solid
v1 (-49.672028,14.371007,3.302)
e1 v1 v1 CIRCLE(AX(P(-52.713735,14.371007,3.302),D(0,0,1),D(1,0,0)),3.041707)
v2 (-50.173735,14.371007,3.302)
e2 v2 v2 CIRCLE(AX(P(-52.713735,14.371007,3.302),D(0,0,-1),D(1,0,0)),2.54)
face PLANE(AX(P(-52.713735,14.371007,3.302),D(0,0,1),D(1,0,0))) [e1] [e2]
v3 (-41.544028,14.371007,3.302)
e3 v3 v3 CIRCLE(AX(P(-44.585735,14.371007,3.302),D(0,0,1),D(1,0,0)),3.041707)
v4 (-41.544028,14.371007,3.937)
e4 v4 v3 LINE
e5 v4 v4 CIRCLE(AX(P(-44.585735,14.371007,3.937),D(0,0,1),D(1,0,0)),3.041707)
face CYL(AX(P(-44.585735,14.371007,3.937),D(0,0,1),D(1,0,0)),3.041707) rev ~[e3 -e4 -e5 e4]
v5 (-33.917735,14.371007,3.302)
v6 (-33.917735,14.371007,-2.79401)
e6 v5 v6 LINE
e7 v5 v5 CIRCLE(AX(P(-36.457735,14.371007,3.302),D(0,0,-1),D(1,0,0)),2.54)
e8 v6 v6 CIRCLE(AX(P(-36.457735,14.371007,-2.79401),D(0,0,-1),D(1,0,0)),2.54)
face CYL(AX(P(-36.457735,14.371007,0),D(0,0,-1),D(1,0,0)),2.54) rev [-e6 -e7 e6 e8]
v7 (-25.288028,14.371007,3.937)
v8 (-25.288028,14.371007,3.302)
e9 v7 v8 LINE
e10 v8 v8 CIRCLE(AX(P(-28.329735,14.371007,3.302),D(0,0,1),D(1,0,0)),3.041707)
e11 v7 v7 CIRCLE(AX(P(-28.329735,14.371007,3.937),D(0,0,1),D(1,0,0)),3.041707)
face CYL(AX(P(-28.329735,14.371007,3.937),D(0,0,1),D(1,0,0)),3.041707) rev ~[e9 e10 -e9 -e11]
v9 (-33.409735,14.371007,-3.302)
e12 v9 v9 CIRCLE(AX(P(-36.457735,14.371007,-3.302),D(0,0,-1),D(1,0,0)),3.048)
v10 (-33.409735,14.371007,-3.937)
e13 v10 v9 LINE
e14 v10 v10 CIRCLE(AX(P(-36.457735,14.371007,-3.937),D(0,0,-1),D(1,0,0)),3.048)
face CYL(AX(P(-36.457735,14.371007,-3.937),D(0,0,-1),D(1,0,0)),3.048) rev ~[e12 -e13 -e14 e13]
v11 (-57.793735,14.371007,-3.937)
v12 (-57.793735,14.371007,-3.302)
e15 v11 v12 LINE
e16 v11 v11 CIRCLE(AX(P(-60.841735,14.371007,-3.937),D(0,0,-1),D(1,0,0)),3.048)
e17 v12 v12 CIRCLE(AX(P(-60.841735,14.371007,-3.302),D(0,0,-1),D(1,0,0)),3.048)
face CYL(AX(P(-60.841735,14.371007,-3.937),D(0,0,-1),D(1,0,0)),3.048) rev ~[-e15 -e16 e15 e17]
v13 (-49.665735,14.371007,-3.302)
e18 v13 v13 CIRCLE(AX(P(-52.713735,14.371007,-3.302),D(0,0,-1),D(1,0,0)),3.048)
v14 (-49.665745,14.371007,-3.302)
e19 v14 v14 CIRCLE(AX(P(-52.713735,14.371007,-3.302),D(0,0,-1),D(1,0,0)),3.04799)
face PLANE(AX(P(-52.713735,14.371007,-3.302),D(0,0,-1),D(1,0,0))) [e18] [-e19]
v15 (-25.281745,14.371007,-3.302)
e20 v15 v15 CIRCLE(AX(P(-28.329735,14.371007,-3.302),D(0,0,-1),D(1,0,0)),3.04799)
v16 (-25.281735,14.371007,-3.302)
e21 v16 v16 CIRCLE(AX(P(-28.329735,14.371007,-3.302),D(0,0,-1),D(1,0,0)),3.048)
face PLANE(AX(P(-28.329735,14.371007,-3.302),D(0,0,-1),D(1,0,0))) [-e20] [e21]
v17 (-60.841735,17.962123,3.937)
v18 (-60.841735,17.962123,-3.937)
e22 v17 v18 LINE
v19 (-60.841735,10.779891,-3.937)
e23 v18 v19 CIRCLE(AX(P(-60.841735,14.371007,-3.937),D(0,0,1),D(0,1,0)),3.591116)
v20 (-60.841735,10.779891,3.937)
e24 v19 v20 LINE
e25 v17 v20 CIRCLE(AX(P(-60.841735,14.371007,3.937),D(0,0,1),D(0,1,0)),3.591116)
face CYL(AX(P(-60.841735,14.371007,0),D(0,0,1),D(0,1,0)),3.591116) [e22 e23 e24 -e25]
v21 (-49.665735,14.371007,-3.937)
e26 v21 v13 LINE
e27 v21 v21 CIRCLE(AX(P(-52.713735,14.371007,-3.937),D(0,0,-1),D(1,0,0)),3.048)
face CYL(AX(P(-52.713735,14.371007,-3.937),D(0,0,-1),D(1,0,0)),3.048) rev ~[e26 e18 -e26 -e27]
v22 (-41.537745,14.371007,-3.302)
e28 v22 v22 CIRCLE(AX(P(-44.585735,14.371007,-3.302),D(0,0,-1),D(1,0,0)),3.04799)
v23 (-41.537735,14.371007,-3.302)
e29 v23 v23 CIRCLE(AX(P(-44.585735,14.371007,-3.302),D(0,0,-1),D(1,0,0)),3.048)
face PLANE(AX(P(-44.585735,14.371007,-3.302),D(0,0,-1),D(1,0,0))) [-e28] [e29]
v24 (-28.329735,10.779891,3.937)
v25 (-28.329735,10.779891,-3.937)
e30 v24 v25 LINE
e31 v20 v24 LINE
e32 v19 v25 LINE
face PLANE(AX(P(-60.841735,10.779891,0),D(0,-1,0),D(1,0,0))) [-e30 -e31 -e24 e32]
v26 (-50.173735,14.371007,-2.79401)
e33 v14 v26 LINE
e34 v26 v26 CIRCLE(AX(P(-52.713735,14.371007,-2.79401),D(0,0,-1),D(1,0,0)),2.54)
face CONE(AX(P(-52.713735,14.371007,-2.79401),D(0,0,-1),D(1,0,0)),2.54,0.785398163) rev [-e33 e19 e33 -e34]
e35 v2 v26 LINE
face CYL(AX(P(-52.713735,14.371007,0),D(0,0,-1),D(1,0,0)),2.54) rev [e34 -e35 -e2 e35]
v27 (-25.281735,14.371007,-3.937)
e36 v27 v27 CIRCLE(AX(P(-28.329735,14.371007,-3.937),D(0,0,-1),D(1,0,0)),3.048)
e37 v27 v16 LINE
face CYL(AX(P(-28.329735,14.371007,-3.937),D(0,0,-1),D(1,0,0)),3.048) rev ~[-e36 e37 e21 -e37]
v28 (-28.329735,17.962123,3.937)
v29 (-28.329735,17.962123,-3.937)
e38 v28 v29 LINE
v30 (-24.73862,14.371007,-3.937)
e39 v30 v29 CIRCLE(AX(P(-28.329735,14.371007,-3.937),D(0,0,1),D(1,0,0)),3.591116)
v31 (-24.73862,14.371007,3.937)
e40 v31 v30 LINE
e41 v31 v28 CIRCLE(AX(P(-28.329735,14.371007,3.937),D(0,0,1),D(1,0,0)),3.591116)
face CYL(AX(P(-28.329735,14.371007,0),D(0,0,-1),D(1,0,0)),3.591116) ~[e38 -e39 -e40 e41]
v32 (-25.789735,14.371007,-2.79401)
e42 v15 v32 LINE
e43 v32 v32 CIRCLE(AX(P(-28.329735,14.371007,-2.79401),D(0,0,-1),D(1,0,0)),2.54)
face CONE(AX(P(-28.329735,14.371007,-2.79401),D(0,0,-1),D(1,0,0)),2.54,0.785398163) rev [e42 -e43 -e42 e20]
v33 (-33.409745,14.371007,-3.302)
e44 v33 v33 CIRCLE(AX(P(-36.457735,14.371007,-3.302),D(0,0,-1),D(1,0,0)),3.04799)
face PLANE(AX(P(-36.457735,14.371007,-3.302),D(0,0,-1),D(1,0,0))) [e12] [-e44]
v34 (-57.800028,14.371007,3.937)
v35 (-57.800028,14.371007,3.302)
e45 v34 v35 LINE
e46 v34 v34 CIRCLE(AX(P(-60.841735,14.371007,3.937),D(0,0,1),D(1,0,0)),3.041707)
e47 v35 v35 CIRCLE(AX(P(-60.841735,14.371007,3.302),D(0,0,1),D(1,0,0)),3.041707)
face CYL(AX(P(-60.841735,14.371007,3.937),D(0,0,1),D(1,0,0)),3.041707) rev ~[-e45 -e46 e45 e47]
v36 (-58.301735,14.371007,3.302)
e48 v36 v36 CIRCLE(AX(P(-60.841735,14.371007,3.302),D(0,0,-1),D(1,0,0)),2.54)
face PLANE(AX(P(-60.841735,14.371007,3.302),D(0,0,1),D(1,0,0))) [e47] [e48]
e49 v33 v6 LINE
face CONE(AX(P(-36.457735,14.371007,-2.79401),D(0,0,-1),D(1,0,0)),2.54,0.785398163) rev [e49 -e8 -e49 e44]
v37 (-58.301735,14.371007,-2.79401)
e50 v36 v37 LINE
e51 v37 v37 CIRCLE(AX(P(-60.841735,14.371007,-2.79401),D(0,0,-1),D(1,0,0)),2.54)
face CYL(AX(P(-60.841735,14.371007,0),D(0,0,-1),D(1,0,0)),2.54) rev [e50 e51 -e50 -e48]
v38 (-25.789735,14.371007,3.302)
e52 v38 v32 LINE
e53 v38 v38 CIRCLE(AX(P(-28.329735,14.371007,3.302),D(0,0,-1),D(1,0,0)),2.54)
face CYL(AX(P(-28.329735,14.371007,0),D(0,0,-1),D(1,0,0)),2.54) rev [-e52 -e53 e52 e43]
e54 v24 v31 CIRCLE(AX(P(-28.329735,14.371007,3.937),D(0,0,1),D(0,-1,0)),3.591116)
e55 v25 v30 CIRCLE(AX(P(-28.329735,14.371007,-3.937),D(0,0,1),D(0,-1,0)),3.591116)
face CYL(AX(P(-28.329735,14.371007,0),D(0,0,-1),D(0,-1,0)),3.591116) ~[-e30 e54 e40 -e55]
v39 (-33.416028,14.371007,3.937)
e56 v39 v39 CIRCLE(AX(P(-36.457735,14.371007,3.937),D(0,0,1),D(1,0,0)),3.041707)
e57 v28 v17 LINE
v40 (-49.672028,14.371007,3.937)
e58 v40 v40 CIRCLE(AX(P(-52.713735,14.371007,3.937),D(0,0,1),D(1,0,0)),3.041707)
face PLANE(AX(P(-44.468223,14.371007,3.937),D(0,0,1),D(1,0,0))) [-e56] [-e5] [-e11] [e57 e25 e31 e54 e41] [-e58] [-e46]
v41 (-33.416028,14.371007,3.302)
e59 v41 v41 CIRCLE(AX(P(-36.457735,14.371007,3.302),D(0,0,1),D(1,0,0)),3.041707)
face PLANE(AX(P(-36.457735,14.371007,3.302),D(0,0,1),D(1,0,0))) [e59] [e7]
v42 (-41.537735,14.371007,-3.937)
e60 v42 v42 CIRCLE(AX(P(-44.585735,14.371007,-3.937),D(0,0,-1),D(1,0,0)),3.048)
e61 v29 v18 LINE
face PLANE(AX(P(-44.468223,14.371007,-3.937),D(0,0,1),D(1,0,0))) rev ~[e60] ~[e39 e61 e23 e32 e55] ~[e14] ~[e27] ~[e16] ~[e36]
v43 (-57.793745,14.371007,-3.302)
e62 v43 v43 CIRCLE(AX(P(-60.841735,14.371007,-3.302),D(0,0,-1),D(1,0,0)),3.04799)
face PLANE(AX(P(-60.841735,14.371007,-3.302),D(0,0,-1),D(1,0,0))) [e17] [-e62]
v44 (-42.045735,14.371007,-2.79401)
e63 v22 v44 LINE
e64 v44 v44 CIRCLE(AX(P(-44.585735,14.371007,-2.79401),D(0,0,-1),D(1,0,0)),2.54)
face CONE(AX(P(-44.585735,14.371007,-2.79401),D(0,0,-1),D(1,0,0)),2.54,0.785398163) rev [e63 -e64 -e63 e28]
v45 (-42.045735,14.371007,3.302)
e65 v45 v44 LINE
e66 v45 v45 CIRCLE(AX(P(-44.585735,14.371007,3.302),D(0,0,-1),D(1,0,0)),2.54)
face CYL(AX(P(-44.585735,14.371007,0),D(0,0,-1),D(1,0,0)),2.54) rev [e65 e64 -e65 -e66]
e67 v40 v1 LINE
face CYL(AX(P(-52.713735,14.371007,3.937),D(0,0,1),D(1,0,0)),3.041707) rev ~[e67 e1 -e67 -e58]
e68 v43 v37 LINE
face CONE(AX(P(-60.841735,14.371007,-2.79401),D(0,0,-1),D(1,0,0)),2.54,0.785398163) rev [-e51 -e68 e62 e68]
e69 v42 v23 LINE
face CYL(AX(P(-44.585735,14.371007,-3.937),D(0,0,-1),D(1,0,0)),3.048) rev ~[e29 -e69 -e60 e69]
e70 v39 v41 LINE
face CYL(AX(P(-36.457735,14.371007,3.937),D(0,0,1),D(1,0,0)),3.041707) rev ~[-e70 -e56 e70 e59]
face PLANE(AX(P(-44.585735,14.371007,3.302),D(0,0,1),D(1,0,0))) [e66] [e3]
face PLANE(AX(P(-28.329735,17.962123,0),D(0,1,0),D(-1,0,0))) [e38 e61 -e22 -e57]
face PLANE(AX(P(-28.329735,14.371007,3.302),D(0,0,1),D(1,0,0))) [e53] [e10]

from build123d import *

# Parameters (mm, degrees)
F0_R     = 3.048
F0_R_2   = 2.54
F1_DEPTH = 3.937
F2_R     = 3.0417071759
F3_DEPTH = 0.635
F4_R     = 3.048
F5_DEPTH = 0.635
F6_SIZE2 = 0.50799
F6_SIZE  = 0.50799
F7_SIZE2 = 0.50799
F7_SIZE  = 0.50799


# Not quite as in the source:
# - a fillet or chamfer is up to 0.001 mm smaller than in the source, because OpenCascade refuses the exact size


with BuildPart() as f1:
    # F0 (on Top) → F1 (new body, symmetric)
    with BuildSketch(Plane.XY):
        with BuildLine():
            ThreePointArc((-40.9946195992, 14.3710068385), (-42.0464330806, 16.9103092103), (-44.5857354524, 17.9621226917))
            ThreePointArc((-44.5857354524, 17.9621226917), (-48.1768513056, 14.3710068385), (-44.5857354524, 10.7798909853))
            ThreePointArc((-44.5857354524, 10.7798909853), (-42.0464330806, 11.8317044667), (-40.9946195992, 14.3710068385))
        make_face()
        with Locations((-44.5857354524, 14.3710068385)):
            Circle(F0_R, mode=Mode.SUBTRACT)
        with BuildLine():
            ThreePointArc((-49.1226195992, 14.3710068385), (-50.1744330806, 16.9103092103), (-52.7137354524, 17.9621226917))
            ThreePointArc((-52.7137354524, 17.9621226917), (-56.3048513056, 14.3710068385), (-52.7137354524, 10.7798909853))
            ThreePointArc((-52.7137354524, 10.7798909853), (-50.1744330806, 11.8317044667), (-49.1226195992, 14.3710068385))
        make_face()
        with Locations((-52.7137354524, 14.3710068385)):
            Circle(F0_R, mode=Mode.SUBTRACT)
        with BuildLine():
            ThreePointArc((-32.8666195992, 14.3710068385), (-33.9184330806, 16.9103092103), (-36.4577354524, 17.9621226917))
            ThreePointArc((-36.4577354524, 17.9621226917), (-40.0488513056, 14.3710068385), (-36.4577354524, 10.7798909853))
            ThreePointArc((-36.4577354524, 10.7798909853), (-33.9184330806, 11.8317044667), (-32.8666195992, 14.3710068385))
        make_face()
        with Locations((-36.4577354524, 14.3710068385)):
            Circle(F0_R, mode=Mode.SUBTRACT)
        with BuildLine():
            ThreePointArc((-24.7386195992, 14.3710068385), (-25.7904330806, 16.9103092103), (-28.3297354524, 17.9621226917))
            ThreePointArc((-28.3297354524, 17.9621226917), (-31.9208513056, 14.3710068385), (-28.3297354524, 10.7798909853))
            ThreePointArc((-28.3297354524, 10.7798909853), (-25.7904330806, 11.8317044667), (-24.7386195992, 14.3710068385))
        make_face()
        with Locations((-28.3297354524, 14.3710068385)):
            Circle(F0_R, mode=Mode.SUBTRACT)
        with BuildLine():
            ThreePointArc((-60.8417354524, 10.7798909853), (-58.3024330806, 11.8317044667), (-57.2506195992, 14.3710068385))
            ThreePointArc((-57.2506195992, 14.3710068385), (-58.3024330806, 16.9103092103), (-60.8417354524, 17.9621226917))
            ThreePointArc((-60.8417354524, 17.9621226917), (-64.4328513056, 14.3710068385), (-60.8417354524, 10.7798909853))
        make_face()
        with Locations((-60.8417354524, 14.3710068385)):
            Circle(F0_R, mode=Mode.SUBTRACT)
        with Locations((-44.5857354524, 14.3710068385)):
            Circle(F0_R)
        with Locations((-44.5857354524, 14.3710068385)):
            Circle(F0_R_2, mode=Mode.SUBTRACT)
        with Locations((-36.4577354524, 14.3710068385)):
            Circle(F0_R)
        with Locations((-36.4577354524, 14.3710068385)):
            Circle(F0_R_2, mode=Mode.SUBTRACT)
        with Locations((-52.7137354524, 14.3710068385)):
            Circle(F0_R)
        with Locations((-52.7137354524, 14.3710068385)):
            Circle(F0_R_2, mode=Mode.SUBTRACT)
        with Locations((-28.3297354524, 14.3710068385)):
            Circle(F0_R)
        with Locations((-28.3297354524, 14.3710068385)):
            Circle(F0_R_2, mode=Mode.SUBTRACT)
        with Locations((-60.8417354524, 14.3710068385)):
            Circle(F0_R)
        with Locations((-60.8417354524, 14.3710068385)):
            Circle(F0_R_2, mode=Mode.SUBTRACT)
        with BuildLine():
            ThreePointArc((-60.8417354524, 17.9621226917), (-58.3024330806, 16.9103092103), (-57.2506195992, 14.3710068385))
            ThreePointArc((-57.2506195992, 14.3710068385), (-58.3024330806, 11.8317044667), (-60.8417354524, 10.7798909853))
            Line((-60.8417354524, 10.7798909853), (-52.7137354524, 10.7798909853))
            ThreePointArc((-52.7137354524, 10.7798909853), (-56.3048513056, 14.3710068385), (-52.7137354524, 17.9621226917))
            Line((-52.7137354524, 17.9621226917), (-60.8417354524, 17.9621226917))
        make_face()
        with BuildLine():
            Line((-44.5857354524, 17.9621226917), (-52.7137354524, 17.9621226917))
            ThreePointArc((-52.7137354524, 17.9621226917), (-50.1744330806, 16.9103092103), (-49.1226195992, 14.3710068385))
            ThreePointArc((-49.1226195992, 14.3710068385), (-50.1744330806, 11.8317044667), (-52.7137354524, 10.7798909853))
            Line((-52.7137354524, 10.7798909853), (-44.5857354524, 10.7798909853))
            ThreePointArc((-44.5857354524, 10.7798909853), (-48.1768513056, 14.3710068385), (-44.5857354524, 17.9621226917))
        make_face()
        with BuildLine():
            Line((-28.3297354524, 17.9621226917), (-36.4577354524, 17.9621226917))
            ThreePointArc((-36.4577354524, 17.9621226917), (-33.9184330806, 16.9103092103), (-32.8666195992, 14.3710068385))
            ThreePointArc((-32.8666195992, 14.3710068385), (-33.9184330806, 11.8317044667), (-36.4577354524, 10.7798909853))
            Line((-36.4577354524, 10.7798909853), (-28.3297354524, 10.7798909853))
            ThreePointArc((-28.3297354524, 10.7798909853), (-31.9208513056, 14.3710068385), (-28.3297354524, 17.9621226917))
        make_face()
        with BuildLine():
            Line((-36.4577354524, 17.9621226917), (-44.5857354524, 17.9621226917))
            ThreePointArc((-44.5857354524, 17.9621226917), (-42.0464330806, 16.9103092103), (-40.9946195992, 14.3710068385))
            ThreePointArc((-40.9946195992, 14.3710068385), (-42.0464330806, 11.8317044667), (-44.5857354524, 10.7798909853))
            Line((-44.5857354524, 10.7798909853), (-36.4577354524, 10.7798909853))
            ThreePointArc((-36.4577354524, 10.7798909853), (-40.0488513056, 14.3710068385), (-36.4577354524, 17.9621226917))
        make_face()
    extrude(amount=F1_DEPTH, both=True)

    # F2 (on face) → F3 (cut)
    with BuildSketch(Plane.XY.offset(3.937)):
        with Locations((-28.3297354524, 14.3710068385)):
            Circle(F2_R)
        with Locations((-36.4577354524, 14.3710068385)):
            Circle(F2_R)
        with Locations((-44.5857354524, 14.3710068385)):
            Circle(F2_R)
        with Locations((-52.7137354524, 14.3710068385)):
            Circle(F2_R)
        with Locations((-60.8417354524, 14.3710068385)):
            Circle(F2_R)
    extrude(amount=-F3_DEPTH, mode=Mode.SUBTRACT)

    # F4 (on face) → F5 (cut)
    with BuildSketch(Plane(origin=(0, 0, -3.937), x_dir=(1, 0, 0), z_dir=(0, 0, -1))):
        with Locations((-60.8417354524, -14.3710068385)):
            Circle(F4_R)
        with Locations((-52.7137354524, -14.3710068385)):
            Circle(F4_R)
        with Locations((-44.5857354524, -14.3710068385)):
            Circle(F4_R)
        with Locations((-36.4577354524, -14.3710068385)):
            Circle(F4_R)
        with Locations((-28.3297354524, -14.3710068385)):
            Circle(F4_R)
    extrude(amount=-F5_DEPTH, mode=Mode.SUBTRACT)

    # F6 (size 0.508 and 0.508 in the source; OpenCascade refuses exactly that, so slightly less here)
    f6_edges = [f1.edges().sort_by_distance(p)[0] for p in [
        (-38.997735, 14.371007, -3.302),
    ]]
    chamfer(f6_edges, length=F6_SIZE, length2=F6_SIZE2)

    # F7 (size 0.508 and 0.508 in the source; OpenCascade refuses exactly that, so slightly less here)
    f7_edges = [f1.edges().sort_by_distance(p)[0] for p in [
        (-47.125735, 14.371007, -3.302),
        (-55.253735, 14.371007, -3.302),
        (-63.381735, 14.371007, -3.302),
        (-30.869735, 14.371007, -3.302),
    ]]
    chamfer(f7_edges, length=F7_SIZE, length2=F7_SIZE2)


solid = f1.part
